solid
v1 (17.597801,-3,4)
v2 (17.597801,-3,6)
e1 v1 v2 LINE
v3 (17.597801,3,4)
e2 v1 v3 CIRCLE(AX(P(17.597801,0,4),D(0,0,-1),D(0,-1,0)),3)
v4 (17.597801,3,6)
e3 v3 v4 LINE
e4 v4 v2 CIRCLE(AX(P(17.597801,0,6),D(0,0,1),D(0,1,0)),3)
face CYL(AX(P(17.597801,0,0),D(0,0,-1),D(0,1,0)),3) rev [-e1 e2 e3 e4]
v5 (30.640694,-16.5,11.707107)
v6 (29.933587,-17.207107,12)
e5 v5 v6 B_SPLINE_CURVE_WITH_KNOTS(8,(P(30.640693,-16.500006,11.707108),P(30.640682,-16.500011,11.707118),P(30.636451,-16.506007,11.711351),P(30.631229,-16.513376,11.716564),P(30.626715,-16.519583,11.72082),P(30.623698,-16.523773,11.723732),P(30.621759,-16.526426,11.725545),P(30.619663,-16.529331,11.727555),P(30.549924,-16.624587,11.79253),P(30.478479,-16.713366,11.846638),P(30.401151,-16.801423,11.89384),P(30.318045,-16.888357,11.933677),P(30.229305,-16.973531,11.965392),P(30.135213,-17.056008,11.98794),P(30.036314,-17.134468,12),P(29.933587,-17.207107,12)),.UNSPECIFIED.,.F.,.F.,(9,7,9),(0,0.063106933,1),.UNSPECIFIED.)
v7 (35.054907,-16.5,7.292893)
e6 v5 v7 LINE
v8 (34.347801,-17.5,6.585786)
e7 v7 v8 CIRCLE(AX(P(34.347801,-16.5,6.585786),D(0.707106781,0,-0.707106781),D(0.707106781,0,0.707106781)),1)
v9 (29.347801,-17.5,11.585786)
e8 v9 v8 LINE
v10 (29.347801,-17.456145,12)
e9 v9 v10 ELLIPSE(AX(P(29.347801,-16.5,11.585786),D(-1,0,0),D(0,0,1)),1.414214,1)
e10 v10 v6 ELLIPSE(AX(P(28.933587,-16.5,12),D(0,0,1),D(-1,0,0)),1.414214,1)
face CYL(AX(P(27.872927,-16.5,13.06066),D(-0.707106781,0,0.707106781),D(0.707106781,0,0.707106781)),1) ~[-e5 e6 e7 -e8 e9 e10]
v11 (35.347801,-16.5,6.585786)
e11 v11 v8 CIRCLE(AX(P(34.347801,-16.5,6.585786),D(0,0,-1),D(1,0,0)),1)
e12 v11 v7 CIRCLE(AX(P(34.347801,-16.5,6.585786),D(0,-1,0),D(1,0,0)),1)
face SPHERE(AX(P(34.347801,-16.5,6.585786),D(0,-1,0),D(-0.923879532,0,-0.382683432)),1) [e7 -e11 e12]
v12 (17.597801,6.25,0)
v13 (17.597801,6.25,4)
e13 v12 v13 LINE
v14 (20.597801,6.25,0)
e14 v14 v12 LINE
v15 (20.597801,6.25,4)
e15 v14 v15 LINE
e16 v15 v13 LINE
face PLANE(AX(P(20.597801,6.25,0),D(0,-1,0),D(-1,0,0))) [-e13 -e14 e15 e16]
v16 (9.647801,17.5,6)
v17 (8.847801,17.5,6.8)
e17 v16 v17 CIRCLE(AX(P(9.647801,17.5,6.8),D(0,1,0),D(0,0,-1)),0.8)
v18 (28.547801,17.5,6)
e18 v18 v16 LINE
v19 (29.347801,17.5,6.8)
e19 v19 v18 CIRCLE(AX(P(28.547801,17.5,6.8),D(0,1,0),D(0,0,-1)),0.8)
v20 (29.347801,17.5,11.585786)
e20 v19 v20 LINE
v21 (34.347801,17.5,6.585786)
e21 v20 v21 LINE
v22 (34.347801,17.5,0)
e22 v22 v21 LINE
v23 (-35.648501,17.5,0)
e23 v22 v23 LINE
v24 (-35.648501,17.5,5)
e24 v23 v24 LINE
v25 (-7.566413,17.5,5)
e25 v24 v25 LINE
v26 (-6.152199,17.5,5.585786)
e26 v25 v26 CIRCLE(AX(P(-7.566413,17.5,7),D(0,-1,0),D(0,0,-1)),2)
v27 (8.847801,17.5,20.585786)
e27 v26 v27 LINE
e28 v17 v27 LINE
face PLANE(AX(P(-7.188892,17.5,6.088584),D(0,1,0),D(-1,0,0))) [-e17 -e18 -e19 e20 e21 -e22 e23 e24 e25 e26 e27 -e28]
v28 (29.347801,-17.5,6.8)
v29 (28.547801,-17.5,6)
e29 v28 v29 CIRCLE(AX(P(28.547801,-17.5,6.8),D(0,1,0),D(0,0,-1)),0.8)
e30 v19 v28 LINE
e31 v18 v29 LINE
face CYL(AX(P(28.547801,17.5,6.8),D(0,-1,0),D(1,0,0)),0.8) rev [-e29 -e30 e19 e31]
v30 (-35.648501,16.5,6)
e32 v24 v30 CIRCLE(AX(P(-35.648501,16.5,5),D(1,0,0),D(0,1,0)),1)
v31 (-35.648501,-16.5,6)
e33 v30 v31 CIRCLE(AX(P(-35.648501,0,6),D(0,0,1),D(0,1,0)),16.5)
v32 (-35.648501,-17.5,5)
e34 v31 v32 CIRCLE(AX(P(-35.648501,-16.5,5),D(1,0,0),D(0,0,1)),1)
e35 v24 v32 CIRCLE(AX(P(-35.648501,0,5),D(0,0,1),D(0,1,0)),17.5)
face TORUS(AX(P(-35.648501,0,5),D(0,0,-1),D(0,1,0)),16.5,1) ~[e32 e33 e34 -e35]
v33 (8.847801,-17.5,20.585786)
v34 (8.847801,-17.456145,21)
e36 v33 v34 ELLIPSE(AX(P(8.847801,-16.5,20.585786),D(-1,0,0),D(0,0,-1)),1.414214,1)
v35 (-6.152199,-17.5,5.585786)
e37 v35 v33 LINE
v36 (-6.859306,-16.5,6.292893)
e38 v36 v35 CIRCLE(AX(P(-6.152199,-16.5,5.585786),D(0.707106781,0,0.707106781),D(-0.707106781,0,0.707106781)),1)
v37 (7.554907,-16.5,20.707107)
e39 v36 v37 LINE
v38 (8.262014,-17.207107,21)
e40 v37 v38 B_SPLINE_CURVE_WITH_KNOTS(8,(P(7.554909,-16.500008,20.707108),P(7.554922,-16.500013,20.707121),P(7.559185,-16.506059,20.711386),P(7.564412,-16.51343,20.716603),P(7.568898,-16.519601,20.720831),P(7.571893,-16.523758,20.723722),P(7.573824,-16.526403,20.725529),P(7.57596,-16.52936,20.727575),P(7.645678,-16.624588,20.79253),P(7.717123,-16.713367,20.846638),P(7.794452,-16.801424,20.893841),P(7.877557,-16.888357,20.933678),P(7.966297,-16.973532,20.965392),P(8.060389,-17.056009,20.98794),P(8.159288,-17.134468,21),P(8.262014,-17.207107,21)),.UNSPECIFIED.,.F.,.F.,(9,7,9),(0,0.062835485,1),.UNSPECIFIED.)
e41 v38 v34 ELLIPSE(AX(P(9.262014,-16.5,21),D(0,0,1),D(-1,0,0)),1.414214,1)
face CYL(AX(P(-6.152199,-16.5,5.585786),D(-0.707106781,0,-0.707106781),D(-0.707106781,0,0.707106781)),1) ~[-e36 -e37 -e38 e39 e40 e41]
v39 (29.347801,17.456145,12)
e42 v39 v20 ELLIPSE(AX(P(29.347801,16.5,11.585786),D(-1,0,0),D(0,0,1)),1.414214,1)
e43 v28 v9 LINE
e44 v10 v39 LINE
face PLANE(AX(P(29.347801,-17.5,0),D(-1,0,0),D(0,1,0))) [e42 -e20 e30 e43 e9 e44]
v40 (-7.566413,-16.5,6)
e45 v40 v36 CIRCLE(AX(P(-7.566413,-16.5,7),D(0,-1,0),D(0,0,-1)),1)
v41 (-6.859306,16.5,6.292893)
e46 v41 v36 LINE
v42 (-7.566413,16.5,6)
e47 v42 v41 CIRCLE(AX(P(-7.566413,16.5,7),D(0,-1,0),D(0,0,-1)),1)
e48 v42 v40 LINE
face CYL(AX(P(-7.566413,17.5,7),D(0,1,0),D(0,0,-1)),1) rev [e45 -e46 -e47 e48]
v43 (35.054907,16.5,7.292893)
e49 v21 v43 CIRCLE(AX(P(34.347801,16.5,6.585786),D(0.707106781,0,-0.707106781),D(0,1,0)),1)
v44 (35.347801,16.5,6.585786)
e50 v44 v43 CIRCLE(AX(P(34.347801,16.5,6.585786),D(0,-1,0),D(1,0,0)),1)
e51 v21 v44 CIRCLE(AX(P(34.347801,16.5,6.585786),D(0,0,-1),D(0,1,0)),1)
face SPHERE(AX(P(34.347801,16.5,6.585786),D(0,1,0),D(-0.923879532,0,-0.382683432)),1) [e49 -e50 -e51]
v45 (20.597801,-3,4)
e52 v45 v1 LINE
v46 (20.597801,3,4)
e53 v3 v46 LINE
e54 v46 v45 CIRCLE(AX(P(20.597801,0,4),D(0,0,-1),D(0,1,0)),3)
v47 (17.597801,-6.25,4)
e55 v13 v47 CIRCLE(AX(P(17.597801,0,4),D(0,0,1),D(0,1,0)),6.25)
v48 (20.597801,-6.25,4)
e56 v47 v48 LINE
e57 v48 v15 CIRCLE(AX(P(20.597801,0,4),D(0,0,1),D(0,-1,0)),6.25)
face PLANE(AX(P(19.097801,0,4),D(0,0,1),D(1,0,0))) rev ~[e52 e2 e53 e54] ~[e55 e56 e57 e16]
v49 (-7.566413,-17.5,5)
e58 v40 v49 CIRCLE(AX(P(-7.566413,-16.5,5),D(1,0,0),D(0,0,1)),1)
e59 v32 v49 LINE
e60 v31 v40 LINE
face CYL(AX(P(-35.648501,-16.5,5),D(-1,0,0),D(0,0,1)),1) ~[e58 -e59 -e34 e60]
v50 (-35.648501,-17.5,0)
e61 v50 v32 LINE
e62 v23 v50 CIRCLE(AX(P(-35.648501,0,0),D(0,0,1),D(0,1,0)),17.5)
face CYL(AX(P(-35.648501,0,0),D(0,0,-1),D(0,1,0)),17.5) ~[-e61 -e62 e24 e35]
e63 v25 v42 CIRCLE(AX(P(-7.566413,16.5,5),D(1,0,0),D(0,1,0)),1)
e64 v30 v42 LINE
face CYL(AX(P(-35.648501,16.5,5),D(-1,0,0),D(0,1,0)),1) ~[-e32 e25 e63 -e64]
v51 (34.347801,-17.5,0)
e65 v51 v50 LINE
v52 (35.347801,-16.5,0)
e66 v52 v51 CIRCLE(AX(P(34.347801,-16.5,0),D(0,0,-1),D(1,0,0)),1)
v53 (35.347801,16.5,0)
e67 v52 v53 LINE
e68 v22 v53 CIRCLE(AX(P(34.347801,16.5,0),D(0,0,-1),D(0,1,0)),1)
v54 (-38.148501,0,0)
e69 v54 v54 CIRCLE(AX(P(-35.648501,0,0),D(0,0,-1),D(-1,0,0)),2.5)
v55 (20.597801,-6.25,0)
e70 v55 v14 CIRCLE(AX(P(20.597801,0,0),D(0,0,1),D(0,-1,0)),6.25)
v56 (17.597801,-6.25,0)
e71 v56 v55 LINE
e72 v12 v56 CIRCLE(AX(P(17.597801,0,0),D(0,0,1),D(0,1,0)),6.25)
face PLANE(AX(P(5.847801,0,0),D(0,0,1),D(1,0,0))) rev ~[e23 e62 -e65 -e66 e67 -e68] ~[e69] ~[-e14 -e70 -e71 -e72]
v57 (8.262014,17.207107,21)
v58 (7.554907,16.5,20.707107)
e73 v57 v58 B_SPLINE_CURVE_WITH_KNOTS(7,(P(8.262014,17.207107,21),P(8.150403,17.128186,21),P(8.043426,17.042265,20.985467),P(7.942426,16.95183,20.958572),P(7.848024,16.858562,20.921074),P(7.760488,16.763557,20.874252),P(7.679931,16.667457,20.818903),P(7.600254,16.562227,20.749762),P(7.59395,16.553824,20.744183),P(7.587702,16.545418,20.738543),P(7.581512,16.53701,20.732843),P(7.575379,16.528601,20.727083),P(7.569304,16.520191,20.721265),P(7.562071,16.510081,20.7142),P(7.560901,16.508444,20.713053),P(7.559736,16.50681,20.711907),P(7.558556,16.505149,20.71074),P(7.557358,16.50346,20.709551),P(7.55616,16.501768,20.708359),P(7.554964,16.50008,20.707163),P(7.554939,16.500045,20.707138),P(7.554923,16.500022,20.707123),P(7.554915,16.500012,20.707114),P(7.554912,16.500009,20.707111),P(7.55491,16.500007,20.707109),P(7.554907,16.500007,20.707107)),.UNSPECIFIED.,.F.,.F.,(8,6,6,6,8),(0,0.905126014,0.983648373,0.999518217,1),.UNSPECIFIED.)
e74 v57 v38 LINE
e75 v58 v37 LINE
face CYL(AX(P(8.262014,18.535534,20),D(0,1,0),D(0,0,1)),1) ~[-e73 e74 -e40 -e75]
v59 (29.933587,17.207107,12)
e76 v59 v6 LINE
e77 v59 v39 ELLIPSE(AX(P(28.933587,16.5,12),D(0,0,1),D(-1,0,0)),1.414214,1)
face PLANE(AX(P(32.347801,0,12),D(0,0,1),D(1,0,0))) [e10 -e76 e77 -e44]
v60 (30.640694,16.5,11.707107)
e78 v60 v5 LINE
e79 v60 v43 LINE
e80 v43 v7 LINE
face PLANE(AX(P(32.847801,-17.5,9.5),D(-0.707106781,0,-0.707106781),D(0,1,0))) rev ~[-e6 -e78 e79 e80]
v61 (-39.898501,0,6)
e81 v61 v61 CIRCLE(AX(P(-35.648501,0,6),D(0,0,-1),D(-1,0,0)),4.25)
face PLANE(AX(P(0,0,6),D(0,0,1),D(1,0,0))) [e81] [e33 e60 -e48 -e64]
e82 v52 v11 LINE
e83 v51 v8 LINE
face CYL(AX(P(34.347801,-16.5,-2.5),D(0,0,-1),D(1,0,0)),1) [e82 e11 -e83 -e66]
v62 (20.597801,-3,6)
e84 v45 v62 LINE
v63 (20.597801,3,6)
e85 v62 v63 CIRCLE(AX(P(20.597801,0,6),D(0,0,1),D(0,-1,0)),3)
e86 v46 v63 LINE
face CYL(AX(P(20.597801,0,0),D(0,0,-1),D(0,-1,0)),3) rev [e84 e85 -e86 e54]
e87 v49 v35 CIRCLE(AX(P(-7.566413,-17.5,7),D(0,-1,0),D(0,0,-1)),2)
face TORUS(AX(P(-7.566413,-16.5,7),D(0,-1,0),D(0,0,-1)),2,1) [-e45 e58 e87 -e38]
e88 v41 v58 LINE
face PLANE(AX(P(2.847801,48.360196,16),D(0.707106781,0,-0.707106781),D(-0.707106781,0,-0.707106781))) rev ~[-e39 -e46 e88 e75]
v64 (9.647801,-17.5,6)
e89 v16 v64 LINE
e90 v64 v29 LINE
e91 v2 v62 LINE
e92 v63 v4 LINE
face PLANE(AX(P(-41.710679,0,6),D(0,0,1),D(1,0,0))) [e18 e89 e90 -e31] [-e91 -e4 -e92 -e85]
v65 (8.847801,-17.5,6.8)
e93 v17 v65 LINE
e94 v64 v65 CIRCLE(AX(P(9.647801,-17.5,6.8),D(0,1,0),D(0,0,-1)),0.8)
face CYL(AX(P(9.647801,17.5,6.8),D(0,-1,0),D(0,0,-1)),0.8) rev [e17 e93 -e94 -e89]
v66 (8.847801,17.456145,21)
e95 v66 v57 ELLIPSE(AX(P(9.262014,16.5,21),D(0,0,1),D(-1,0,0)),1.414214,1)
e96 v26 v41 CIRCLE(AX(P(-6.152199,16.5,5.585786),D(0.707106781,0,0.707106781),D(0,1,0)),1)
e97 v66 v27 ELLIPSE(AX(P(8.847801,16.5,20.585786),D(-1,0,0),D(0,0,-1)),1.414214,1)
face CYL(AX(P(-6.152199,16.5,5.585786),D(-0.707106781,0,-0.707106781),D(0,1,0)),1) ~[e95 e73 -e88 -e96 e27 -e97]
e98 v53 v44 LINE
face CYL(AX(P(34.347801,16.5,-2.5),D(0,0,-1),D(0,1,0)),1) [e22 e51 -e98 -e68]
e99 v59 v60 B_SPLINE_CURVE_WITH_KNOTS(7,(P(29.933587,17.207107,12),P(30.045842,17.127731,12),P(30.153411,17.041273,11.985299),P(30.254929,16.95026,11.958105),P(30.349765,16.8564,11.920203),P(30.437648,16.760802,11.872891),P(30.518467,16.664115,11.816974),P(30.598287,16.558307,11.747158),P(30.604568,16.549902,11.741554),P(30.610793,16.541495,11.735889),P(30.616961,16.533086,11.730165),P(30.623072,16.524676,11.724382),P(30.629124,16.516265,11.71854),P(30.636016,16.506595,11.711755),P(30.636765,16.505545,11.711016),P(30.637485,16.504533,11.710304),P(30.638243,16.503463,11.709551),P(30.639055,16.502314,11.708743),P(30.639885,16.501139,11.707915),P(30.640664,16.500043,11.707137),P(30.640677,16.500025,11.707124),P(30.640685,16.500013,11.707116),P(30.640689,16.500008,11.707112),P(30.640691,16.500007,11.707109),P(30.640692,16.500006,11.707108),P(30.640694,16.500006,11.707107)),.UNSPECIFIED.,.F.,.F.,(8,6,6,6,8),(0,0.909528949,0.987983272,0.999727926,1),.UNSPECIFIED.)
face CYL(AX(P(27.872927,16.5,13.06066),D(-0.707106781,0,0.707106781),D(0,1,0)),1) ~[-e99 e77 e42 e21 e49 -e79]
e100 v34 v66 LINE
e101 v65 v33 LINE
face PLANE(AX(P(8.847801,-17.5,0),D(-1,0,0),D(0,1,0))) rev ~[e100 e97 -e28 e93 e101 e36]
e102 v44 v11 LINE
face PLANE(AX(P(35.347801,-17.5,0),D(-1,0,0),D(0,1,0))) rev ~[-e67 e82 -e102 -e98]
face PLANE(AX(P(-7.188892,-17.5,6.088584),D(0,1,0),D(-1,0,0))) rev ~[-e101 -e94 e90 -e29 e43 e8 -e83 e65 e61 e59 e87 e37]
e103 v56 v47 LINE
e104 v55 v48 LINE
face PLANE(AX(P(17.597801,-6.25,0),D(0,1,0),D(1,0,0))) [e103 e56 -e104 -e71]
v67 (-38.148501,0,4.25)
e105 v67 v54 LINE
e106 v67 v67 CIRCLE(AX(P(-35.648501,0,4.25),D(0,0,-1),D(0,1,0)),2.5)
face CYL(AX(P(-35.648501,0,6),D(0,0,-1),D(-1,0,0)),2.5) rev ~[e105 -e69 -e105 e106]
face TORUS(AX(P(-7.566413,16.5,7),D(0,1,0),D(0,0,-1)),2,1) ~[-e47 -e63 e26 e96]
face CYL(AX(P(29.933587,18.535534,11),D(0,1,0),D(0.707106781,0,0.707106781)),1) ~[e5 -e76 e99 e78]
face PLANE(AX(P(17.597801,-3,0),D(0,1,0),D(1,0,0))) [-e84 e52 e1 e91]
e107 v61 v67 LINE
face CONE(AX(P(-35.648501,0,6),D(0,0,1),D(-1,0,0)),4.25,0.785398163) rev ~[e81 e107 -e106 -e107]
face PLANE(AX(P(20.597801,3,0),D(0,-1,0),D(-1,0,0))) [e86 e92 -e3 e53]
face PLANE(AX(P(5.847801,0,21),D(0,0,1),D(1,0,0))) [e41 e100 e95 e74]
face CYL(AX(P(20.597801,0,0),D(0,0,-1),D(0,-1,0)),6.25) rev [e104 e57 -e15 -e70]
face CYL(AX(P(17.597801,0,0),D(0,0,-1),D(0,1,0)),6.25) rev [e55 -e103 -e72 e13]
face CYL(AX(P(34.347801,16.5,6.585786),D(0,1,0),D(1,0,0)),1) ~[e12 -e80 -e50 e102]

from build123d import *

# Parameters (mm, degrees)
F0_W            = 6
F0_H            = 35
F0_W_2          = 38.4963016563
F0_W_3          = 20.5
F1_DEPTH        = 6
F2_DEPTH        = 12
F3_SIZE         = 5
F4_DEPTH        = 21
F5_SIZE         = 5
F6_DEPTH        = 12
F7_T4_DEPTH     = 96.7203917112
F8_T1_DEPTH     = 35
F8_T3_DEPTH     = 28.0820880939
F8_T5_DEPTH     = 9.0857864376
F8_T7_DEPTH     = 9.1568542495
F8_T9_DEPTH     = 33
F8_T11_DEPTH    = 23.2989898732
F8_T13_DEPTH    = 37.0710678119
F8_T18_DEPTH    = 1.02
F8_T24_DEPTH    = 1.02
F8_T28_ANGLE    = 180
F8_T30_ANGLE    = 45
F8_T32_ANGLE    = 45
F9_R            = 0.8
F12_D           = 5
F12_CSINK_D     = 8.5
F12_CSINK_ANGLE = 90
F14_DEPTH       = 6
F15_DEPTH       = 4


# Not quite as in the source:
# - a fillet or chamfer that OpenCascade refuses, or shapes differently, is made with other operations: its cross-section is extruded or revolved along the edge and cut away or added


with BuildPart() as f1:
    # F0 (on Top) → F1 (new body)
    with BuildSketch(Plane.XY):
        with BuildLine():
            Line((-35.6485009767, -17.5), (-35.6485009767, 17.5))
            ThreePointArc((-35.6485009767, 17.5), (-53.1485009767, 0), (-35.6485009767, -17.5))
        make_face()
        with Locations((32.3478006796, 0)):
            Rectangle(F0_W, F0_H)
        with Locations((-16.4003501485, 0)):
            Rectangle(F0_W_2, F0_H)
        with Locations((19.0978006796, 0)):
            Rectangle(F0_W_3, F0_H)
        with Locations((5.8478006796, 0)):
            Rectangle(F0_W, F0_H)
    extrude(amount=F1_DEPTH)

    # F0 (on Top) → F2 (join)
    with BuildSketch(Plane.XY):
        with Locations((32.3478006796, 0)):
            Rectangle(F0_W, F0_H)
    extrude(amount=F2_DEPTH)

    # F3
    f3_edges = [f1.edges().sort_by_distance(p)[0] for p in [
        (35.347801, 0, 12),
    ]]
    chamfer(f3_edges, length=F3_SIZE)

    # F0 (on Top) → F4 (join)
    with BuildSketch(Plane.XY):
        with Locations((5.8478006796, 0)):
            Rectangle(F0_W, F0_H)
    extrude(amount=F4_DEPTH)

    # F5
    f5_edges = [f1.edges().sort_by_distance(p)[0] for p in [
        (2.847801, 0, 21),
    ]]
    chamfer(f5_edges, length=F5_SIZE)

    # F6 (add): a face of the model
    f6_faces = [f1.faces().sort_by_distance(p)[0] for p in [
        (2.8478006796, 0, 11),
    ]]
    extrude(f6_faces, amount=F6_DEPTH)

    # F7: chamfer of 12 on 4 edges, made by hand


with BuildPart() as f7_tool2:
    # F7_s3 → F7_t4 (new body)
    with BuildSketch(Plane.XZ.offset(-48.3601958556)):
        Polygon((2.8478006796, 16), (-9.1521993204, 4), (-9.1521993204, 16), align=None)
    extrude(amount=F7_T4_DEPTH)

    split(bisect_by=Plane.XY.offset(6), keep=Keep.TOP)


with BuildPart() as f1_1:
    add(f1.part)

    # F7_t1: cut F7_tool2
    add(f7_tool2.part, mode=Mode.SUBTRACT)

    # F8: fillet of radius 1 on 13 edges, made by hand

    # F8_s2 → F8_t1 (join)
    with BuildSketch(Plane.XZ.offset(-17.5)):
        with BuildLine():
            ThreePointArc((-7.5664128828, 6), (-7.1837294504, 6.0761204675), (-6.8593061016, 6.2928932188))
            Line((-6.8593061016, 6.2928932188), (-7.1521993204, 6))
            Line((-7.1521993204, 6), (-7.5664128828, 6))
        make_face()
    extrude(amount=F8_T1_DEPTH)

    # F8_s4 → F8_t3 (cut)
    with BuildSketch(Plane.YZ.offset(-35.6485009767)):
        with BuildLine():
            ThreePointArc((-16.5, 6), (-17.2071067812, 5.7071067812), (-17.5, 5))
            Line((-17.5, 5), (-17.5, 6))
            Line((-17.5, 6), (-16.5, 6))
        make_face()
        with BuildLine():
            ThreePointArc((17.5, 5), (17.2071067812, 5.7071067812), (16.5, 6))
            Line((16.5, 6), (17.5, 6))
            Line((17.5, 6), (17.5, 5))
        make_face()
    extrude(amount=F8_T3_DEPTH, mode=Mode.SUBTRACT)

    # F8_s6 → F8_t5 (cut)
    with BuildSketch(Plane.XY.offset(-2.5)):
        with BuildLine():
            ThreePointArc((35.3478006796, -16.5), (35.0549074608, -17.2071067812), (34.3478006796, -17.5))
            Line((34.3478006796, -17.5), (35.3478006796, -17.5))
            Line((35.3478006796, -17.5), (35.3478006796, -16.5))
        make_face()
        with BuildLine():
            ThreePointArc((34.3478006796, 17.5), (35.0549074608, 17.2071067812), (35.3478006796, 16.5))
            Line((35.3478006796, 16.5), (35.3478006796, 17.5))
            Line((35.3478006796, 17.5), (34.3478006796, 17.5))
        make_face()
    extrude(amount=F8_T5_DEPTH, mode=Mode.SUBTRACT)

    # F8_s8 → F8_t7 (cut)
    with BuildSketch(Plane(origin=(7.4061333868, 0, -7.4061333868), x_dir=(0, 1, 0), z_dir=(0.7071067812, 0, -0.7071067812))):
        with BuildLine():
            ThreePointArc((-16.5, 29.9444170289), (-17.2071067812, 29.6515238101), (-17.5, 28.9444170289))
            Line((-17.5, 28.9444170289), (-17.5, 29.9444170289))
            Line((-17.5, 29.9444170289), (-16.5, 29.9444170289))
        make_face()
        with BuildLine():
            ThreePointArc((17.5, 28.9444170289), (17.2071067812, 29.6515238101), (16.5, 29.9444170289))
            Line((16.5, 29.9444170289), (17.5, 29.9444170289))
            Line((17.5, 29.9444170289), (17.5, 28.9444170289))
        make_face()
    extrude(amount=F8_T7_DEPTH, mode=Mode.SUBTRACT)

    # F8_s10 → F8_t9 (cut)
    with BuildSketch(Plane.XZ.offset(-16.5)):
        with BuildLine():
            ThreePointArc((35.3478006796, 6.5857864376), (35.2716802121, 6.96846987), (35.0549074608, 7.2928932188))
            Line((35.0549074608, 7.2928932188), (35.3478006796, 7))
            Line((35.3478006796, 7), (35.3478006796, 6.5857864376))
        make_face()
    extrude(amount=F8_T9_DEPTH, mode=Mode.SUBTRACT)

    # F8_s12 → F8_t11 (cut)
    with BuildSketch(Plane(origin=(-0.2832064414, 0, -0.2832064414), x_dir=(0, 1, 0), z_dir=(0.7071067812, 0, 0.7071067812))):
        with BuildLine():
            ThreePointArc((17.5, 8.300009327), (17.2071067812, 9.0071161082), (16.5, 9.300009327))
            Line((16.5, 9.300009327), (17.5, 9.300009327))
            Line((17.5, 9.300009327), (17.5, 8.300009327))
        make_face()
        with BuildLine():
            ThreePointArc((-16.5, 9.300009327), (-17.2071067812, 9.0071161082), (-17.5, 8.300009327))
            Line((-17.5, 8.300009327), (-17.5, 9.300009327))
            Line((-17.5, 9.300009327), (-16.5, 9.300009327))
        make_face()
    extrude(amount=F8_T11_DEPTH, mode=Mode.SUBTRACT)

    # F8_s14 → F8_t13 (cut)
    with BuildSketch(Plane.XZ.offset(-18.5355339059)):
        with BuildLine():
            ThreePointArc((30.6406938984, 11.7071067812), (30.3162705496, 11.9238795325), (29.9335871172, 12))
            Line((29.9335871172, 12), (30.3478006796, 12))
            Line((30.3478006796, 12), (30.6406938984, 11.7071067812))
        make_face()
        with BuildLine():
            ThreePointArc((8.262014242, 21), (7.8793308096, 20.9238795325), (7.5549074608, 20.7071067812))
            Line((7.5549074608, 20.7071067812), (7.8478006796, 21))
            Line((7.8478006796, 21), (8.262014242, 21))
        make_face()
    extrude(amount=F8_T13_DEPTH, mode=Mode.SUBTRACT)


with BuildPart() as f8_tool16:
    # F8_s17 → F8_t18 (new body)
    with BuildSketch(Plane.XZ.offset(16.5)):
        Polygon((34.3478006796, 6.5857864376), (35.3678006796, 6.5857864376), (35.3678006796, 7.0082842712), (35.0690495964, 7.3070353544), align=None)
    extrude(amount=F8_T18_DEPTH)

    # F8_s19 → F8_t20 (revolve, cut)
    with BuildSketch(Plane(origin=(34.3478006796, -16.5, 6.5857864376), x_dir=(-0.9238795325, 0, -0.3826834324), z_dir=(-0.3826834324, 0, 0.9238795325))):
        with BuildLine():
            ThreePointArc((0, -1), (1, 0), (0, 1))
            Line((0, 1), (0, -1))
        make_face()
    revolve(axis=Axis((34.3478006796, -16.5, 6.5857864376), (0, -1, 0)), mode=Mode.SUBTRACT)


with BuildPart() as f1_2:
    add(f1_1.part)

    # F8_t15: cut F8_tool16
    add(f8_tool16.part, mode=Mode.SUBTRACT)


with BuildPart() as f8_tool22:
    # F8_s23 → F8_t24 (new body)
    with BuildSketch(Plane.XZ.offset(-16.5)):
        Polygon((34.3478006796, 6.5857864376), (35.3678006796, 6.5857864376), (35.3678006796, 7.0082842712), (35.0690495964, 7.3070353544), align=None)
    extrude(amount=-F8_T24_DEPTH)

    # F8_s25 → F8_t26 (revolve, cut)
    with BuildSketch(Plane(origin=(34.3478006796, 16.5, 6.5857864376), x_dir=(-0.9238795325, 0, -0.3826834324), z_dir=(0.3826834324, 0, -0.9238795325))):
        with BuildLine():
            ThreePointArc((0, -1), (1, 0), (0, 1))
            Line((0, 1), (0, -1))
        make_face()
    revolve(axis=Axis((34.3478006796, 16.5, 6.5857864376), (0, 1, 0)), mode=Mode.SUBTRACT)


with BuildPart() as f1_3:
    add(f1_2.part)

    # F8_t21: cut F8_tool22
    add(f8_tool22.part, mode=Mode.SUBTRACT)

    # F8_s27 → F8_t28 (revolve, cut)
    with BuildSketch(Plane.YZ.offset(-35.6485009767)):
        with BuildLine():
            ThreePointArc((16.5, 6), (17.2071067812, 5.7071067812), (17.5, 5))
            Line((17.5, 5), (17.5, 6))
            Line((17.5, 6), (16.5, 6))
        make_face()
    revolve(axis=Axis((-35.6485009767, 0, 6), (0, 0, 1)), revolution_arc=F8_T28_ANGLE, mode=Mode.SUBTRACT)

    # F8_s29 → F8_t30 (revolve, cut)
    with BuildSketch(Plane.YZ.offset(-7.5664128828)):
        with BuildLine():
            ThreePointArc((-17.5, 5), (-17.2071067812, 5.7071067812), (-16.5, 6))
            Line((-16.5, 6), (-17.5, 6))
            Line((-17.5, 6), (-17.5, 5))
        make_face()
    revolve(axis=Axis((-7.5664128828, -17.5, 7), (0, -1, 0)), revolution_arc=F8_T30_ANGLE, mode=Mode.SUBTRACT)

    # F8_s31 → F8_t32 (revolve, cut)
    with BuildSketch(Plane.YZ.offset(-7.5664128828)):
        with BuildLine():
            ThreePointArc((17.5, 5), (17.2071067812, 5.7071067812), (16.5, 6))
            Line((16.5, 6), (17.5, 6))
            Line((17.5, 6), (17.5, 5))
        make_face()
    revolve(axis=Axis((-7.5664128828, 17.5, 7), (0, -1, 0)), revolution_arc=F8_T32_ANGLE, mode=Mode.SUBTRACT)

    # F9
    f9_edges = [f1_3.edges().sort_by_distance(p)[0] for p in [
        (8.847801, 0, 6),
        (29.347801, 0, 6),
    ]]
    fillet(f9_edges, radius=F9_R)

    # F12 (through all)
    with Locations(Plane.XY.offset(6)):
        with Locations((-35.6485009767, 0)):
            CounterSinkHole(F12_D / 2, F12_CSINK_D / 2, counter_sink_angle=F12_CSINK_ANGLE)

    # F13 (on face) → F14 (cut, through all)
    with BuildSketch(Plane.XY):
        with BuildLine():
            ThreePointArc((20.5978006796, -3), (23.5978006796, 0), (20.5978006796, 3))
            Line((20.5978006796, 3), (17.5978006796, 3))
            ThreePointArc((17.5978006796, 3), (14.5978006796, 0), (17.5978006796, -3))
            Line((17.5978006796, -3), (20.5978006796, -3))
        make_face()
    extrude(amount=F14_DEPTH, mode=Mode.SUBTRACT)

    # F13 (on face) → F15 (cut)
    with BuildSketch(Plane.XY):
        with BuildLine():
            ThreePointArc((20.5978006796, -6.25), (26.8478006796, 0), (20.5978006796, 6.25))
            Line((20.5978006796, 6.25), (17.5978006796, 6.25))
            ThreePointArc((17.5978006796, 6.25), (11.3478006796, 0), (17.5978006796, -6.25))
            Line((17.5978006796, -6.25), (20.5978006796, -6.25))
        make_face()
        with BuildLine():
            Line((17.5978006796, 3), (20.5978006796, 3))
            ThreePointArc((20.5978006796, 3), (23.5978006796, 0), (20.5978006796, -3))
            Line((20.5978006796, -3), (17.5978006796, -3))
            ThreePointArc((17.5978006796, -3), (14.5978006796, 0), (17.5978006796, 3))
        make_face(mode=Mode.SUBTRACT)
    extrude(amount=F15_DEPTH, mode=Mode.SUBTRACT)


solid = f1_3.part
